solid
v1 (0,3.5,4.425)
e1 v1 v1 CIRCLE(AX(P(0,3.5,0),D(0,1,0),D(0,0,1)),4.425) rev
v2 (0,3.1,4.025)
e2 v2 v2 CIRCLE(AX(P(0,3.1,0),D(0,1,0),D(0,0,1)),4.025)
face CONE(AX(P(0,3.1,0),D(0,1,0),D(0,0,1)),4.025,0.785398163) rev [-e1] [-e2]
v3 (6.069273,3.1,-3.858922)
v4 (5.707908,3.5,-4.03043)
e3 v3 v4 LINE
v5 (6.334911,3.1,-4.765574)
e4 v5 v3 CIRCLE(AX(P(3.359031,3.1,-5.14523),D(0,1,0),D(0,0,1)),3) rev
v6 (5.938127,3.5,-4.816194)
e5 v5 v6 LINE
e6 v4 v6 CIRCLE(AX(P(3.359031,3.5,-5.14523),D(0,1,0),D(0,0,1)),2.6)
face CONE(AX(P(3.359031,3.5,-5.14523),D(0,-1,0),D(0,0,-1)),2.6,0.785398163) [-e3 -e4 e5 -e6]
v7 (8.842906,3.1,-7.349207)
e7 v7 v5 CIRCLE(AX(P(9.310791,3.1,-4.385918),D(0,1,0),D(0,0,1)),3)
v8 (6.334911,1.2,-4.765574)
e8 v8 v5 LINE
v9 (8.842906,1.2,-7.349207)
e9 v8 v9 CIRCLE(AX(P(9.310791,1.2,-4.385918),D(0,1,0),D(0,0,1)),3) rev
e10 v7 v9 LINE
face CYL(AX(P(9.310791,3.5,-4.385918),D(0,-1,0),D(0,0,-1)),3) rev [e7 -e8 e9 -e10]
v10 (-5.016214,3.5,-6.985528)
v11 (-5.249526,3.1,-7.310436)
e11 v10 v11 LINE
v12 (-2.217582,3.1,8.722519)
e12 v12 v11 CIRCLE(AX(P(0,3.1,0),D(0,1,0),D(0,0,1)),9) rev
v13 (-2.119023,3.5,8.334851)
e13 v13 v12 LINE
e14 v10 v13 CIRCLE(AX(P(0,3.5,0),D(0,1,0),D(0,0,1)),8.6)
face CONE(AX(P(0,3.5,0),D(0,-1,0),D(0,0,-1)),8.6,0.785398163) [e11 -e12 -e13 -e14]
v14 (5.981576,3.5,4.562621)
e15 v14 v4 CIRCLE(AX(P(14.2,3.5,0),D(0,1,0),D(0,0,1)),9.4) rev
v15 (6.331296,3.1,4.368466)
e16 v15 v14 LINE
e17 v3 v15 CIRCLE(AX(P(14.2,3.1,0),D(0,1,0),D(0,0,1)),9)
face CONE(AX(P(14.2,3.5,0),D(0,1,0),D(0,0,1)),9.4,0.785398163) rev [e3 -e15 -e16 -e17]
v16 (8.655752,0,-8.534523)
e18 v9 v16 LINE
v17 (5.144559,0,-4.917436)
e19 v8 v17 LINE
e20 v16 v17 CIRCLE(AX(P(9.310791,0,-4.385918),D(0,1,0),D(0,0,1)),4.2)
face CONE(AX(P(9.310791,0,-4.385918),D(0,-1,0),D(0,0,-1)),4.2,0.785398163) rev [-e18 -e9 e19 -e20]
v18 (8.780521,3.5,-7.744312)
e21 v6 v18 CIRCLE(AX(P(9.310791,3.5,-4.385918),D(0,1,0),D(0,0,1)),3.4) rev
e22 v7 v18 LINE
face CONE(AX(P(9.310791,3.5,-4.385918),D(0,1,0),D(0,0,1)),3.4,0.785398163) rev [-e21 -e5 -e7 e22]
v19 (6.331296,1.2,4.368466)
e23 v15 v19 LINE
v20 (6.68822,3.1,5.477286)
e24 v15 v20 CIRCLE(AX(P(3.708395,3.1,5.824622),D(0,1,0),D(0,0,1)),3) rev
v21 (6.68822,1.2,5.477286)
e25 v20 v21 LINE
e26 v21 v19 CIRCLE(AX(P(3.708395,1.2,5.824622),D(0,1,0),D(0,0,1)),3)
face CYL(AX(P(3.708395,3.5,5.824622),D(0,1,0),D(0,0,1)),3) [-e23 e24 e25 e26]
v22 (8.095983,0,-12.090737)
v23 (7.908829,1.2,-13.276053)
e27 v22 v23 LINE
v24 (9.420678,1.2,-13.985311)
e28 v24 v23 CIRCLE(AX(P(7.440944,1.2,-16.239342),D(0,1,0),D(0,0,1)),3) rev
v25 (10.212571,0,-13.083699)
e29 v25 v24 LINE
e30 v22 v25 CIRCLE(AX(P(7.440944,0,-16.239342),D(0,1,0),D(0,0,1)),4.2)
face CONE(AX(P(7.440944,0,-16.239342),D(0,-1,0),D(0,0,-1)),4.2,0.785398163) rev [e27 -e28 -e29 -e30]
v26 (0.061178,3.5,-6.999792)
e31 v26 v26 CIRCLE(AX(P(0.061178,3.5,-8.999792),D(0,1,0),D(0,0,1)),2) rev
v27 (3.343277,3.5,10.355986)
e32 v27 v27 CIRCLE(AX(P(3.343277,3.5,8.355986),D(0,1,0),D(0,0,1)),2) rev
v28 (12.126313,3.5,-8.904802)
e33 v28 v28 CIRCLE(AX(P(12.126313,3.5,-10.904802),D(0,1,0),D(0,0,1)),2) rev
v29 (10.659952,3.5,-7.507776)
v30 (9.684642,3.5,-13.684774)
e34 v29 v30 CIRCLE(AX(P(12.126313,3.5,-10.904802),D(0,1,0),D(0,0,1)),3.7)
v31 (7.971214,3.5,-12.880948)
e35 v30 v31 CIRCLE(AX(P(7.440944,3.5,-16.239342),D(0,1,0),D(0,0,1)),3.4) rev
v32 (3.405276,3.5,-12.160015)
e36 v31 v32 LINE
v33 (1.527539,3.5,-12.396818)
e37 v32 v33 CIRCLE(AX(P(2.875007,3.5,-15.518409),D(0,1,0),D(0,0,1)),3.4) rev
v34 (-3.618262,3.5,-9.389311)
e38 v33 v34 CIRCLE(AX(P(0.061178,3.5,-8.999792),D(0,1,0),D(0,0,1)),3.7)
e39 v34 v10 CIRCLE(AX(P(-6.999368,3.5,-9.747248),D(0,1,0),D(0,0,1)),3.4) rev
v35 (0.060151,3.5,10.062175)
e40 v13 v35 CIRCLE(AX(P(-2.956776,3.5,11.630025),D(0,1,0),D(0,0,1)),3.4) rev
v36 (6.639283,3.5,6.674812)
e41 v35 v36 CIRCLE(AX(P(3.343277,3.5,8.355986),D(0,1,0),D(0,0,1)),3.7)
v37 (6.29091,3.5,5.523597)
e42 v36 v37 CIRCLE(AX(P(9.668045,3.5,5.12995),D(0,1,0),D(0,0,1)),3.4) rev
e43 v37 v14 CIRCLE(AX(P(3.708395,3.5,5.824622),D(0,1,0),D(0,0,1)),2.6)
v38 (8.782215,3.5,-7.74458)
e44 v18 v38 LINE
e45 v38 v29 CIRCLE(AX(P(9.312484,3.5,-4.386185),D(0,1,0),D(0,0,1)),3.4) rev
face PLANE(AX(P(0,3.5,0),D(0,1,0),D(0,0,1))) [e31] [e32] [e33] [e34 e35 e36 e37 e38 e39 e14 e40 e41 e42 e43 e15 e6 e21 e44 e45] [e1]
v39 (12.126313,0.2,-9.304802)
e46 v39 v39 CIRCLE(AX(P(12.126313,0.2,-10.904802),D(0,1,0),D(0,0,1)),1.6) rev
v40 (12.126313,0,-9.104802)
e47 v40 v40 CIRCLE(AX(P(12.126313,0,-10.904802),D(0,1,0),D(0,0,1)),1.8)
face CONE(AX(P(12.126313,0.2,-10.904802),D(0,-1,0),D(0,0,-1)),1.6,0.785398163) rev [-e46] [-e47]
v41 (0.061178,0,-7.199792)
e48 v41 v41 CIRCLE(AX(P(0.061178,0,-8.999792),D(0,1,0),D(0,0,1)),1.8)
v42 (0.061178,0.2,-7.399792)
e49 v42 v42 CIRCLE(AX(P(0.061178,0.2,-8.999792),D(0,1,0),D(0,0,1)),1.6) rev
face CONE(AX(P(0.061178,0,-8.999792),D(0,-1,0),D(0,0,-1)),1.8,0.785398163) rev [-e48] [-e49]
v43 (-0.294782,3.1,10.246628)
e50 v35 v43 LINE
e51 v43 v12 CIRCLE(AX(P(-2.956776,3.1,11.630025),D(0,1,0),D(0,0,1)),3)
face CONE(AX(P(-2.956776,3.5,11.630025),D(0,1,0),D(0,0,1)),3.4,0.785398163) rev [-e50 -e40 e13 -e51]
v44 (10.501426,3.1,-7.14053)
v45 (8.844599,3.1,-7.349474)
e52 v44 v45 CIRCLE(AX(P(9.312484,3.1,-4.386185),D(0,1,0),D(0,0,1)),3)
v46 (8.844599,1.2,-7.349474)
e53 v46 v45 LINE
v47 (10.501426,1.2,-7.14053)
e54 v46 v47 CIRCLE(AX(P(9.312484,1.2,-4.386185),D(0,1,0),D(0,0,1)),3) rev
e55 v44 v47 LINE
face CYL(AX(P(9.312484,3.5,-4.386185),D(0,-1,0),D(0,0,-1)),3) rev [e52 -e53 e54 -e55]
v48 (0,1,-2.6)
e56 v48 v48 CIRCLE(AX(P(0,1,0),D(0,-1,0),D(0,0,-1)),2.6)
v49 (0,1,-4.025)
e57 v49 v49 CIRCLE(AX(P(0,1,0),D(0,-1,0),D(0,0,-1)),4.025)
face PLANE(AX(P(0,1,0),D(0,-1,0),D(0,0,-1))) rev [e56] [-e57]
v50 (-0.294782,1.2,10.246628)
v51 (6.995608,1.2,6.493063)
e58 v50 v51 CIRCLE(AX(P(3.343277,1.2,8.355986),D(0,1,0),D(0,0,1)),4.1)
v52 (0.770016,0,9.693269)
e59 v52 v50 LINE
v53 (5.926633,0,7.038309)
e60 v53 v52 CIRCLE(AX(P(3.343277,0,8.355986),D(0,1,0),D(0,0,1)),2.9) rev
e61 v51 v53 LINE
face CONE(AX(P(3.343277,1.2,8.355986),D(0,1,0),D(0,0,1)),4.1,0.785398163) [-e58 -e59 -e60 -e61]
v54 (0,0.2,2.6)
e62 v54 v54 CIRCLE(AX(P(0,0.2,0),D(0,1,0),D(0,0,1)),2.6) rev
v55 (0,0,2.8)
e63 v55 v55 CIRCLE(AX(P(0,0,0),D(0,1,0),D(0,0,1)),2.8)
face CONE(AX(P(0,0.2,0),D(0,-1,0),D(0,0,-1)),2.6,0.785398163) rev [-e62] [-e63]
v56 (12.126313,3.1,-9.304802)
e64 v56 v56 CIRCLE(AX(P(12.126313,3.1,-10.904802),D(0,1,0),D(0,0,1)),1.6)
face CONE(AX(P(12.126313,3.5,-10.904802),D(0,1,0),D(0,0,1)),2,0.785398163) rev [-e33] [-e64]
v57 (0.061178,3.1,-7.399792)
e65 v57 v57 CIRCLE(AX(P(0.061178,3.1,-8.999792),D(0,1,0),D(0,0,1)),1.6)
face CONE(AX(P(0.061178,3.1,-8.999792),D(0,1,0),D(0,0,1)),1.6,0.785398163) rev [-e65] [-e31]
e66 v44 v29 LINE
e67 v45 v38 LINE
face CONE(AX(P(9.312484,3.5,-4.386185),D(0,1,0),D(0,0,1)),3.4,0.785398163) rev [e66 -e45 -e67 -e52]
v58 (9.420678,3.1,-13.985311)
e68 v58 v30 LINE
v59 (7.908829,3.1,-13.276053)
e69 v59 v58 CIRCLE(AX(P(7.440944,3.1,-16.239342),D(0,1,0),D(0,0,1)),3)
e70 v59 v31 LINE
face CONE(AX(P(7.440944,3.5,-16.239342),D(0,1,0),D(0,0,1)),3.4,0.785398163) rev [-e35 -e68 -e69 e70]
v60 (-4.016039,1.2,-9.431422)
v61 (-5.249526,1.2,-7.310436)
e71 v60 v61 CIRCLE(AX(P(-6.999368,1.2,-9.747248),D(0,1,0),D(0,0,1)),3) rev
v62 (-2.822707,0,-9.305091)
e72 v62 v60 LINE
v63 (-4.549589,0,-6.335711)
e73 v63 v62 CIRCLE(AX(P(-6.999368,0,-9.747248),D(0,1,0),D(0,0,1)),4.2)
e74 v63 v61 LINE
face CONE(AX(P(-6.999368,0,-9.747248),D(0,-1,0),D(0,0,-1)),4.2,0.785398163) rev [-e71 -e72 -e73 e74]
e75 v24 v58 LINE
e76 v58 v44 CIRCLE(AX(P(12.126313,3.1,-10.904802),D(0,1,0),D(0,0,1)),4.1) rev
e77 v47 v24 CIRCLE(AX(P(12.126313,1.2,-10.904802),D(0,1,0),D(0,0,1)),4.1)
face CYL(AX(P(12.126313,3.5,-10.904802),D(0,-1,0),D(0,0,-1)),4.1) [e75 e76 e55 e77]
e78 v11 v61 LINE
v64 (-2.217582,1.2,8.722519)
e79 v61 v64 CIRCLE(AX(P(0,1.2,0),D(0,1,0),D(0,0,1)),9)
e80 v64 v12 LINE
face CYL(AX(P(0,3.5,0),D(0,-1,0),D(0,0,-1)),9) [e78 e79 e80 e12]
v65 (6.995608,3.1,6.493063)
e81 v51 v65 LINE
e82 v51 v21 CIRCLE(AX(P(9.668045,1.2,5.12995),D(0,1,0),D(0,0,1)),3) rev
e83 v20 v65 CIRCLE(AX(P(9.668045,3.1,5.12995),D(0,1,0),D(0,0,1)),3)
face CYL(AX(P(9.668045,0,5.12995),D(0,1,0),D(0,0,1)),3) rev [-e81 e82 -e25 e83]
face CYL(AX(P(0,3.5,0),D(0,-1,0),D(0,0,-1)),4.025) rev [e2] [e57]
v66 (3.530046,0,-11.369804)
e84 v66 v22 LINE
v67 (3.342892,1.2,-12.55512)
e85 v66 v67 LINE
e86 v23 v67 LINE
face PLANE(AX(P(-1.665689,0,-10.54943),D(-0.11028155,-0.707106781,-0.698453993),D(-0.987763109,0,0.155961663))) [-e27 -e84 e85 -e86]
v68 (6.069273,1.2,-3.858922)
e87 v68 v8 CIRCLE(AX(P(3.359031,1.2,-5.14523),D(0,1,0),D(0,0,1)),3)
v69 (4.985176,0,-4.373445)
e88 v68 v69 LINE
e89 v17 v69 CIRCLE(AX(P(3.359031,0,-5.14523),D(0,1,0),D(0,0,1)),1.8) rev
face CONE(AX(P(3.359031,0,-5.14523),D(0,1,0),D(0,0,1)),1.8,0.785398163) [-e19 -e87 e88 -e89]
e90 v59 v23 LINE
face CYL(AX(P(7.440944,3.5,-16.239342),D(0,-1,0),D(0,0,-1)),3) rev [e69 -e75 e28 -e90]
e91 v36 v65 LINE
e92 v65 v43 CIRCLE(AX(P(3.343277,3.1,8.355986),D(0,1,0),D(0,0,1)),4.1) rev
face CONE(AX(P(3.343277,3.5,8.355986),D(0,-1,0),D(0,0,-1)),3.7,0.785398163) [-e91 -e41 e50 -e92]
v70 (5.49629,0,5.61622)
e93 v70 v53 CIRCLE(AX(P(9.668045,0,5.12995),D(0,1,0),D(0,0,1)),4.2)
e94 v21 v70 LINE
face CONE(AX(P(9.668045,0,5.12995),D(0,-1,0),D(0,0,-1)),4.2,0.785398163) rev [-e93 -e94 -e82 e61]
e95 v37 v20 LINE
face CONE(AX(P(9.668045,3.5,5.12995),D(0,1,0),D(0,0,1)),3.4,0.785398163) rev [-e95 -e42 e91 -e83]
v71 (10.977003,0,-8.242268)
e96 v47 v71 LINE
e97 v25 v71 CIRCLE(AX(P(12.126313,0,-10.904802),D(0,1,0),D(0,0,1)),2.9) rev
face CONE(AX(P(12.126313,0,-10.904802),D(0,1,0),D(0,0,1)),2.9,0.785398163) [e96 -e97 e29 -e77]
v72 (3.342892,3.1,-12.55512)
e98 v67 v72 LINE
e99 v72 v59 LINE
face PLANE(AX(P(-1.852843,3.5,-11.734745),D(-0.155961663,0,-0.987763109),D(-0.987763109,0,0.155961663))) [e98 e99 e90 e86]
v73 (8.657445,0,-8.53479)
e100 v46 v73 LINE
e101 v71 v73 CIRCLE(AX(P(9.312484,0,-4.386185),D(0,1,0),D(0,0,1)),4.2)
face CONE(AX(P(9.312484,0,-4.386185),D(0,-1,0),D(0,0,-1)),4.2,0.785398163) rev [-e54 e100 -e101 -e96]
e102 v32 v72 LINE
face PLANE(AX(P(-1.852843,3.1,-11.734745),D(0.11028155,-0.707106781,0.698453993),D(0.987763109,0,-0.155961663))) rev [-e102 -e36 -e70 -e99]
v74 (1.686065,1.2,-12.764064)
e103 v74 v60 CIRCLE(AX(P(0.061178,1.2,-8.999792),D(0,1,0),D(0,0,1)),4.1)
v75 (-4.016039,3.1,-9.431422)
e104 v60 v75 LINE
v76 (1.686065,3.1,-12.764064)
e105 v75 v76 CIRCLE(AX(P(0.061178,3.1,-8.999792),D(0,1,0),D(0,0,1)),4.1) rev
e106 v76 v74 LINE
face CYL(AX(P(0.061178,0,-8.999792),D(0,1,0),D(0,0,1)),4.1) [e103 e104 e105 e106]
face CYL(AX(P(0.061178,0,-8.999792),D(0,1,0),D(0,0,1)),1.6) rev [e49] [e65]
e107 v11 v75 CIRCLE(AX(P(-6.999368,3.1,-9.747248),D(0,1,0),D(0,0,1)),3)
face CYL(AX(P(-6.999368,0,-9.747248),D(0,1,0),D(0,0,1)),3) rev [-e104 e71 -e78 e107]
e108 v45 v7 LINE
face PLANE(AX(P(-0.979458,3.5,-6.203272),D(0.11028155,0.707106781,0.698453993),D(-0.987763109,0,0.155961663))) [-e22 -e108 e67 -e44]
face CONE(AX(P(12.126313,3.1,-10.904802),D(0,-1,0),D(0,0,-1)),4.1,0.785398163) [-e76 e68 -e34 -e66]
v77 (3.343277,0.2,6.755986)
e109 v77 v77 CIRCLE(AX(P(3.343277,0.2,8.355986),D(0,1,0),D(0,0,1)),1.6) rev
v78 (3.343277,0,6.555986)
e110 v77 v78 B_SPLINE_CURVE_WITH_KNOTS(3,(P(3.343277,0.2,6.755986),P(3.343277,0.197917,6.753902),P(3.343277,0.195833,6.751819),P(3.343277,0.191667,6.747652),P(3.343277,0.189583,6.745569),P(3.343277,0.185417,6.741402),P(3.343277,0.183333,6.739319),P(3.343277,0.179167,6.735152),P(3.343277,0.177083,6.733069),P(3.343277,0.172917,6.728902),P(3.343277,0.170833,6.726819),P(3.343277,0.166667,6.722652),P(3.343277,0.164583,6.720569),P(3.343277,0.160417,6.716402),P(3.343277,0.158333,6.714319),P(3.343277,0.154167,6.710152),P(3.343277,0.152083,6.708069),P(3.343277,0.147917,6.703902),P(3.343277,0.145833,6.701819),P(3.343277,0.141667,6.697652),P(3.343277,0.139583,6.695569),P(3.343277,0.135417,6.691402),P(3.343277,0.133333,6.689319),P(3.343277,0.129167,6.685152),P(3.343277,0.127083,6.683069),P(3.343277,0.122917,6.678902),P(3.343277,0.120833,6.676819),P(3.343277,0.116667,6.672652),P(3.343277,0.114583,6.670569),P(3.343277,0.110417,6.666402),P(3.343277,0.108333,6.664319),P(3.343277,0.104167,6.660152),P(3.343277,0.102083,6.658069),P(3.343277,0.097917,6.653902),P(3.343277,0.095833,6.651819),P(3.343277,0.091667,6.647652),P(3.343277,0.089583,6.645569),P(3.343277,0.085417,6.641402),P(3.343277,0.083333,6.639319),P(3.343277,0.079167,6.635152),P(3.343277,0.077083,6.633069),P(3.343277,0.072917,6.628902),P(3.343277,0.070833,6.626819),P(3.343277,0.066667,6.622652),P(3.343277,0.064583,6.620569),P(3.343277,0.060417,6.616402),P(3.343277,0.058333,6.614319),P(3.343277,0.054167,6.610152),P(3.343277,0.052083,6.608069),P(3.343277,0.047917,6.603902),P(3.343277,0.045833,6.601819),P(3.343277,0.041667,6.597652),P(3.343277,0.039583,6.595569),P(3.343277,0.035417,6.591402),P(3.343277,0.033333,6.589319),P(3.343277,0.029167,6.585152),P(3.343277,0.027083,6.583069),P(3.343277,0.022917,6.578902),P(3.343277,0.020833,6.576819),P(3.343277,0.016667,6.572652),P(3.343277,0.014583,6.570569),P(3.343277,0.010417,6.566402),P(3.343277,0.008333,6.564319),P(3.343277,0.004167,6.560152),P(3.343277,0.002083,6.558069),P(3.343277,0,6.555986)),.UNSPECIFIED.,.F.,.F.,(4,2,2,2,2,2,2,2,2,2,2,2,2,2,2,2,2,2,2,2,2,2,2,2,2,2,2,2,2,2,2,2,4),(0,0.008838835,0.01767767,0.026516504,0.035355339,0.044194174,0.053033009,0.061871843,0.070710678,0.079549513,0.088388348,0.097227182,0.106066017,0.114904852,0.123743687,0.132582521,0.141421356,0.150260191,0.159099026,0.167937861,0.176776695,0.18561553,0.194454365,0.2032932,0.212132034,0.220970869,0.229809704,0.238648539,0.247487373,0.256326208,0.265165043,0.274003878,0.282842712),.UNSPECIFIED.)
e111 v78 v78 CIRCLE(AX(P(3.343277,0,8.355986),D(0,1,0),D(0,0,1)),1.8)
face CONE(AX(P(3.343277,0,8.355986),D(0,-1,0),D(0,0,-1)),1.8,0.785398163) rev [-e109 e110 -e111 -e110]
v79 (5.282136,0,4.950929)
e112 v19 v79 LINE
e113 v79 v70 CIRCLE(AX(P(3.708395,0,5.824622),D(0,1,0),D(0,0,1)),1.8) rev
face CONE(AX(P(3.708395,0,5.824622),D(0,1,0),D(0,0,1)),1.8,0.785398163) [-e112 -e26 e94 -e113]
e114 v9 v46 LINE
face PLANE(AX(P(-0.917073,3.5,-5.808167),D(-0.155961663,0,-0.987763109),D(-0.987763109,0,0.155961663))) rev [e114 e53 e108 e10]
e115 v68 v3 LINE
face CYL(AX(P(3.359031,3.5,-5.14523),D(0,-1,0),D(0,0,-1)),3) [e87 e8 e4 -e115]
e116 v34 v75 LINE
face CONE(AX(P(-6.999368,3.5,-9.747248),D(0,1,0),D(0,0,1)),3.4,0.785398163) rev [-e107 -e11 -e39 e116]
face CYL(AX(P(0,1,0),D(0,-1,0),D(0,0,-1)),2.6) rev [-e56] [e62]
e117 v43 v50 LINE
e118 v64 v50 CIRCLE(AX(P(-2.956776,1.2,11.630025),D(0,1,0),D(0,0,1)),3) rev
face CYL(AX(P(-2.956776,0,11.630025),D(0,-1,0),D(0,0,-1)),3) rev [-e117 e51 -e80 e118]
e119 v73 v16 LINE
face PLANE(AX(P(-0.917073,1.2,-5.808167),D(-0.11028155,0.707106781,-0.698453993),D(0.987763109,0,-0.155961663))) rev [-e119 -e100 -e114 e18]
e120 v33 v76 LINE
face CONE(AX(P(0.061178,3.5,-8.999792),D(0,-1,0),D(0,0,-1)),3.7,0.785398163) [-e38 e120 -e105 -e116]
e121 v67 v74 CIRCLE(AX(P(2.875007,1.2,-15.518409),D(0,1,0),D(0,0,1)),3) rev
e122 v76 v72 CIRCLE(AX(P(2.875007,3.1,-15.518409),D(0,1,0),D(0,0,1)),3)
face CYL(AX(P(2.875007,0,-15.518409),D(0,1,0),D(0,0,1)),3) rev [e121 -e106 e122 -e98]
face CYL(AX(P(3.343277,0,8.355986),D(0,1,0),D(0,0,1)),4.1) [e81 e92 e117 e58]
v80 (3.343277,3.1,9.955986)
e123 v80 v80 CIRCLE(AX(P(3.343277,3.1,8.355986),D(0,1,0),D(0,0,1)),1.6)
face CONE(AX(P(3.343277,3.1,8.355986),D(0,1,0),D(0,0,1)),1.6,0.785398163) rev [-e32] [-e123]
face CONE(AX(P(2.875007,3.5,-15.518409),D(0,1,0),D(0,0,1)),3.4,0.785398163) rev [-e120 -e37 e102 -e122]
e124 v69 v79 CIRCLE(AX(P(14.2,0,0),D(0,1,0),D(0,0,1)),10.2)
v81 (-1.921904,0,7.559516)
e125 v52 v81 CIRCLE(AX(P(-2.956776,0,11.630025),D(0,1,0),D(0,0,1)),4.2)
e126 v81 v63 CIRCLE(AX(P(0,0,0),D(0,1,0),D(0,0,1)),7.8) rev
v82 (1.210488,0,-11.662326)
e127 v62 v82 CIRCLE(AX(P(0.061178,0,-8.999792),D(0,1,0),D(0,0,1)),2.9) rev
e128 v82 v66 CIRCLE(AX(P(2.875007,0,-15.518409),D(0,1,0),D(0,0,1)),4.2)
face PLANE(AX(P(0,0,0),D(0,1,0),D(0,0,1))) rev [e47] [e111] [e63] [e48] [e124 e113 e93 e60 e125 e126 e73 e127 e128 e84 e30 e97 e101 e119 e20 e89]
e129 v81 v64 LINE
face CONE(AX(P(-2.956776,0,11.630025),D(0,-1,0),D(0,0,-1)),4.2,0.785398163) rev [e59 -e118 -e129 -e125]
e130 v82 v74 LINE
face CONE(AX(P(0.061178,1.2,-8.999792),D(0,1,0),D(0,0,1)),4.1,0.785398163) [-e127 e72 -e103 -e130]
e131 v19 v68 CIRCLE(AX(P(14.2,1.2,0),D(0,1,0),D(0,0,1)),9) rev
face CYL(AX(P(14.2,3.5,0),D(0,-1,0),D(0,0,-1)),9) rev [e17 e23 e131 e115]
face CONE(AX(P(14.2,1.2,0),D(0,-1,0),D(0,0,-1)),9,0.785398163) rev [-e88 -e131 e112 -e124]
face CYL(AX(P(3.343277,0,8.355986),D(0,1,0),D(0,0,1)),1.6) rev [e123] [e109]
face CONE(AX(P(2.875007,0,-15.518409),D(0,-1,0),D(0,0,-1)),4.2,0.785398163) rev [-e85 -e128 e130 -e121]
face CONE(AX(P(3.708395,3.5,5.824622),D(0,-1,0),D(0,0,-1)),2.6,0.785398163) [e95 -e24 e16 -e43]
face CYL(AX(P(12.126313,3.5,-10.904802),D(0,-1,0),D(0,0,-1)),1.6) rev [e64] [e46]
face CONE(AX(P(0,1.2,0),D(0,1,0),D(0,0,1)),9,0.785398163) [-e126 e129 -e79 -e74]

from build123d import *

# Parameters (mm, degrees)
SKETCH1_R           = 9
SKETCH1_R_2         = 4.025
BOSS_EXTRUDE1_DEPTH = 3.5
SKETCH2_R           = 4.1
SKETCH2_R_2         = 1.6
BOSS_EXTRUDE2_DEPTH = 3.5
SKETCH6_R           = 9
CUT_EXTRUDE2_DEPTH  = 17.27435259
CUT_EXTRUDE1_START  = -3.5
SKETCH3_R           = 1.6
CUT_EXTRUDE1_DEPTH  = 3.5
SKETCH4_R           = 1.6
BOSS_EXTRUDE3_DEPTH = 3.5
SKETCH5_R           = 4.025
SKETCH5_R_2         = 2.6
BOSS_EXTRUDE4_DEPTH = 1
FILLET1_R           = 3
FILLET9_R           = 3
CHAMFER_1_SIZE      = 1.2
CHAMFER_2_SIZE      = 0.2
CHAMFER_3_SIZE      = 0.4


with BuildPart() as part:
    # Sketch1 → Boss-Extrude1 (new body)
    with BuildSketch(Plane(origin=(0, 0, 0), x_dir=(1, 0, 0), z_dir=(0, 1, 0))):
        with Locations(Location((0, 0, 0), (0, 0, 270))):
            Circle(SKETCH1_R)
        with Locations(Location((0, 0, 0), (0, 0, 270))):
            Circle(SKETCH1_R_2, mode=Mode.SUBTRACT)
    extrude(amount=BOSS_EXTRUDE1_DEPTH)

    # Sketch2 → Boss-Extrude2 (add)
    # profile 1 of 2: a face of its own
    with BuildSketch(Plane(origin=(0, 3.5, 0), x_dir=(1, 0, 0), z_dir=(0, 1, 0))):
        with Locations((3.343277014, -8.355985807)):
            Circle(SKETCH2_R)
        with Locations((3.343277014, -8.355985807)):
            Circle(SKETCH2_R_2, mode=Mode.SUBTRACT)
    # profile 2 of 2: a face of its own
    with BuildSketch(Plane(origin=(0, 3.5, 0), x_dir=(1, 0, 0), z_dir=(0, 1, 0))):
        with Locations((0.061177946, 8.999792068)):
            Circle(SKETCH2_R)
        with Locations((0.061177946, 8.999792068)):
            Circle(SKETCH2_R_2, mode=Mode.SUBTRACT)
    extrude(amount=-BOSS_EXTRUDE2_DEPTH)

    # Sketch6 → Cut-Extrude2 (cut, through all)
    with BuildSketch(Plane(origin=(0, 0, 0), x_dir=(-1, 0, 0), z_dir=(0, -1, 0))):
        with Locations((-14.2, 0)):
            Circle(SKETCH6_R)
    extrude(amount=-CUT_EXTRUDE2_DEPTH, mode=Mode.SUBTRACT)

    # Sketch3 → Cut-Extrude1 (cut)
    with BuildSketch(Plane(origin=(0, 0, 0), x_dir=(-1, 0, 0), z_dir=(0, -1, 0)).offset(CUT_EXTRUDE1_START)):
        with Locations(Location((-0.061177946, 8.999792068, 0), (0, 0, 270))):
            Circle(SKETCH3_R)
        with Locations(Location((-3.343277014, -8.355985807, 0), (0, 0, 270))):
            Circle(SKETCH3_R)
    extrude(amount=CUT_EXTRUDE1_DEPTH, mode=Mode.SUBTRACT)

    # Sketch4 → Boss-Extrude3 (add)
    with BuildSketch(Plane(origin=(0, 0, 0), x_dir=(-1, 0, 0), z_dir=(0, -1, 0))):
        with BuildLine():
            Line((-2.353733001, 12.398937743), (-8.897987933, 13.432234974))
            ThreePointArc((-8.897987933, 13.432234974), (-16.176141716, 11.544244815), (-9.833757914, 7.505656319))
            Line((-9.833757914, 7.505656319), (-5.813078926, 6.870816065))
            ThreePointArc((-5.813078926, 6.870816065), (-4.964487715, 7.506920922), (-4.04696144, 8.038787415))
            ThreePointArc((-4.04696144, 8.038787415), (-3.883103044, 10.484005175), (-2.353733001, 12.398937743))
        make_face()
        with Locations(Location((-12.126312969, 10.904801994, 0), (0, 0, 90))):
            Circle(SKETCH4_R, mode=Mode.SUBTRACT)
    extrude(amount=-BOSS_EXTRUDE3_DEPTH)

    # Sketch5 → Boss-Extrude4 (add)
    with BuildSketch(Plane(origin=(0, 0, 0), x_dir=(-1, 0, 0), z_dir=(0, -1, 0))):
        with Locations(Location((0, 0, 0), (0, 0, 90))):
            Circle(SKETCH5_R)
        with Locations(Location((0, 0, 0), (0, 0, 90))):
            Circle(SKETCH5_R_2, mode=Mode.SUBTRACT)
    extrude(amount=-BOSS_EXTRUDE4_DEPTH)

    # Fillet1
    # the kernel refuses this fillet: 3 mm, written as the material it adds along each edge
    with BuildSketch(Plane(origin=(-0.71019136, 3.5, 8.97193559), x_dir=(-0.9865858542334134, 0, -0.1632432302624714), z_dir=(0, -1, 0))) as fillet1_piece_1:
        with BuildLine():
            CenterArc((1.782533661, -2.98917289), FILLET1_R, 94.869271374, 48.27534012)
            ThreePointArc((-0.617922081, -1.189780705), (-0.260000299, -0.620318503), (0, 0))
            ThreePointArc((0, 0), (0.763942997, -0.03248133), (1.527885995, 0))
        make_face()
    extrude(amount=3.5)
    with BuildSketch(Plane(origin=(-3.93730186, 3.5, -8.093062095), x_dir=(-0.8588495215516518, 0, 0.5122279759350309), z_dir=(0, -1, 0))) as fillet1_piece_2:
        with BuildLine():
            CenterArc((1.782533661, 2.98917289), FILLET1_R, 216.855388506, 48.27534012)
            ThreePointArc((-0.617922081, 1.189780705), (-0.260000299, 0.620318503), (0, 0))
            ThreePointArc((0, 0), (0.763942997, 0.03248133), (1.527885995, 0))
        make_face()
    extrude(amount=3.5)
    with BuildSketch(Plane(origin=(8.897987933, 0, -13.432234974), x_dir=(-0.9877631090139599, 0, 0.15596166346598195), z_dir=(0, 1, 0))) as fillet1_piece_3:
        with BuildLine():
            CenterArc((1.001412857, -3), FILLET1_R, 90, 32.320518146)
            ThreePointArc((-0.602552177, -0.464788732), (-0.290469322, -0.24640426), (0, 0))
            Line((0, 0), (1.001412857, 0))
        make_face()
    extrude(amount=3.5)
    with BuildSketch(Plane(origin=(2.353733001, 0, -12.398937743), x_dir=(-0.8773738132879287, 0, -0.4798074527939294), z_dir=(0, 1, 0)), Plane(origin=(9.833757914, 0, -7.505656319), x_dir=(0.8773738132879222, 0, 0.47980745279394127), z_dir=(0, 1, 0))) as fillet1_piece_4:
        with BuildLine():
            CenterArc((1.039393717, -2.987053466), FILLET1_R, 95.324882893, 32.320518146)
            Line((-0.792924625, -0.611635715), (0, 0))
            ThreePointArc((0, 0), (0.380492343, -0.017693596), (0.760984685, 0))
        make_face()
    extrude(amount=3.5)
    # the kernel refuses this fillet: 3 mm, written as the material it takes off along each edge
    with BuildSketch(Plane(origin=(7.1, 6.983871428, 5.530822724), x_dir=(-0.6413091964506672, 0, 0.7672825519636162), z_dir=(0, -1, 0))) as fillet1_2_piece_1:
        with BuildLine():
            CenterArc((2.400494629, 2.413903277), FILLET1_R, 201.072777054, 32.502187501)
            ThreePointArc((-0.398878795, 1.335242797), (-0.173557144, 0.675353237), (0, 0))
            ThreePointArc((0, 0), (0.309591521, -0.005326404), (0.619183042, 0))
        make_face()
    extrude(amount=10.467742856, mode=Mode.SUBTRACT)
    with BuildSketch(Plane(origin=(7.1, 8.410224582, -5.530822724), x_dir=(-0.5247859915025788, 0, 0.8512341999254115), z_dir=(0, -1, 0))) as fillet1_2_piece_2:
        with BuildLine():
            CenterArc((2.291438138, 2.982087035), FILLET1_R, 203.232841743, 60.502793026)
            ThreePointArc((-0.465290008, 1.798680965), (-0.279182448, 0.88730199), (0, 0))
            ThreePointArc((0, 0), (0.982044916, 0.053738894), (1.964089833, 0))
        make_face()
    extrude(amount=13.320449164, mode=Mode.SUBTRACT)

    # Fillet9
    fillet9_edges = [part.edges().sort_by_distance(p)[0] for p in [
        (6.702912221, 1.75, 6.005911068),
        (5.813078926, 1.75, -6.870816065),
    ]]
    fillet(fillet9_edges, radius=FILLET9_R)

    # 倒角1
    chamfer_1_edges = [part.edges().sort_by_distance(p)[0] for p in [
        (16.176141716, 0, -11.544244815),
        (5.625860467, 0, -12.915586358),
        (-2.007663811, 0, -12.539551069),
        (5.204560758, 0, 0.286483569),
        (5.220072831, 0, 12.001206989),
        (-8.84326494, 0, 1.672323294),
        (6.564091926, 0, 4.905386326),
        (9.687844205, 0, -7.362609827),
        (8.715099113, 0, -13.523365587),
        (2.49964671, 0, -12.541984235),
        (-4.406035705, 0, -8.239061366),
        (-1.093245074, 0, 9.27901385),
        (8.843752485, 0, -7.349340608),
        (6.238006504, 0, -4.301725459),
        (7.158194759, 0, -6.475494242),
        (6.796639749, 0, 5.998875214),
    ]]
    chamfer(chamfer_1_edges, length=CHAMFER_1_SIZE)

    # 倒角2
    chamfer_2_edges = [part.edges().sort_by_distance(p)[0] for p in [
        (4.706817353, 0, 9.19309855),
        (1.13707684, 0, -7.815544808),
        (12.126312969, 0, -9.304801994),
        (0, 0, 2.6),
    ]]
    chamfer(chamfer_2_edges, length=CHAMFER_2_SIZE)

    # 倒角3
    chamfer_3_edges = [part.edges().sort_by_distance(p)[0] for p in [
        (16.176141716, 3.5, -11.544244815),
        (5.625860467, 3.5, -12.915586358),
        (-2.007663811, 3.5, -12.539551069),
        (5.204560758, 3.5, 0.286483569),
        (-8.84326494, 3.5, 1.672323294),
        (5.220072831, 3.5, 12.001206989),
        (6.238006504, 3.5, -4.301725459),
        (9.687844205, 3.5, -7.362609827),
        (8.715099113, 3.5, -13.523365587),
        (2.49964671, 3.5, -12.541984235),
        (-4.406035705, 3.5, -8.239061366),
        (-1.093245074, 3.5, 9.27901385),
        (8.843752485, 3.5, -7.349340608),
        (6.564091926, 3.5, 4.905386326),
        (7.158194759, 3.5, -6.475494242),
        (6.796639749, 3.5, 5.998875214),
        (4.706817353, 3.5, 9.19309855),
        (1.13707684, 3.5, -7.815544808),
        (0, 3.5, -4.025),
        (12.126312969, 3.5, -9.304801994),
    ]]
    chamfer(chamfer_3_edges, length=CHAMFER_3_SIZE)


solid = part.part
